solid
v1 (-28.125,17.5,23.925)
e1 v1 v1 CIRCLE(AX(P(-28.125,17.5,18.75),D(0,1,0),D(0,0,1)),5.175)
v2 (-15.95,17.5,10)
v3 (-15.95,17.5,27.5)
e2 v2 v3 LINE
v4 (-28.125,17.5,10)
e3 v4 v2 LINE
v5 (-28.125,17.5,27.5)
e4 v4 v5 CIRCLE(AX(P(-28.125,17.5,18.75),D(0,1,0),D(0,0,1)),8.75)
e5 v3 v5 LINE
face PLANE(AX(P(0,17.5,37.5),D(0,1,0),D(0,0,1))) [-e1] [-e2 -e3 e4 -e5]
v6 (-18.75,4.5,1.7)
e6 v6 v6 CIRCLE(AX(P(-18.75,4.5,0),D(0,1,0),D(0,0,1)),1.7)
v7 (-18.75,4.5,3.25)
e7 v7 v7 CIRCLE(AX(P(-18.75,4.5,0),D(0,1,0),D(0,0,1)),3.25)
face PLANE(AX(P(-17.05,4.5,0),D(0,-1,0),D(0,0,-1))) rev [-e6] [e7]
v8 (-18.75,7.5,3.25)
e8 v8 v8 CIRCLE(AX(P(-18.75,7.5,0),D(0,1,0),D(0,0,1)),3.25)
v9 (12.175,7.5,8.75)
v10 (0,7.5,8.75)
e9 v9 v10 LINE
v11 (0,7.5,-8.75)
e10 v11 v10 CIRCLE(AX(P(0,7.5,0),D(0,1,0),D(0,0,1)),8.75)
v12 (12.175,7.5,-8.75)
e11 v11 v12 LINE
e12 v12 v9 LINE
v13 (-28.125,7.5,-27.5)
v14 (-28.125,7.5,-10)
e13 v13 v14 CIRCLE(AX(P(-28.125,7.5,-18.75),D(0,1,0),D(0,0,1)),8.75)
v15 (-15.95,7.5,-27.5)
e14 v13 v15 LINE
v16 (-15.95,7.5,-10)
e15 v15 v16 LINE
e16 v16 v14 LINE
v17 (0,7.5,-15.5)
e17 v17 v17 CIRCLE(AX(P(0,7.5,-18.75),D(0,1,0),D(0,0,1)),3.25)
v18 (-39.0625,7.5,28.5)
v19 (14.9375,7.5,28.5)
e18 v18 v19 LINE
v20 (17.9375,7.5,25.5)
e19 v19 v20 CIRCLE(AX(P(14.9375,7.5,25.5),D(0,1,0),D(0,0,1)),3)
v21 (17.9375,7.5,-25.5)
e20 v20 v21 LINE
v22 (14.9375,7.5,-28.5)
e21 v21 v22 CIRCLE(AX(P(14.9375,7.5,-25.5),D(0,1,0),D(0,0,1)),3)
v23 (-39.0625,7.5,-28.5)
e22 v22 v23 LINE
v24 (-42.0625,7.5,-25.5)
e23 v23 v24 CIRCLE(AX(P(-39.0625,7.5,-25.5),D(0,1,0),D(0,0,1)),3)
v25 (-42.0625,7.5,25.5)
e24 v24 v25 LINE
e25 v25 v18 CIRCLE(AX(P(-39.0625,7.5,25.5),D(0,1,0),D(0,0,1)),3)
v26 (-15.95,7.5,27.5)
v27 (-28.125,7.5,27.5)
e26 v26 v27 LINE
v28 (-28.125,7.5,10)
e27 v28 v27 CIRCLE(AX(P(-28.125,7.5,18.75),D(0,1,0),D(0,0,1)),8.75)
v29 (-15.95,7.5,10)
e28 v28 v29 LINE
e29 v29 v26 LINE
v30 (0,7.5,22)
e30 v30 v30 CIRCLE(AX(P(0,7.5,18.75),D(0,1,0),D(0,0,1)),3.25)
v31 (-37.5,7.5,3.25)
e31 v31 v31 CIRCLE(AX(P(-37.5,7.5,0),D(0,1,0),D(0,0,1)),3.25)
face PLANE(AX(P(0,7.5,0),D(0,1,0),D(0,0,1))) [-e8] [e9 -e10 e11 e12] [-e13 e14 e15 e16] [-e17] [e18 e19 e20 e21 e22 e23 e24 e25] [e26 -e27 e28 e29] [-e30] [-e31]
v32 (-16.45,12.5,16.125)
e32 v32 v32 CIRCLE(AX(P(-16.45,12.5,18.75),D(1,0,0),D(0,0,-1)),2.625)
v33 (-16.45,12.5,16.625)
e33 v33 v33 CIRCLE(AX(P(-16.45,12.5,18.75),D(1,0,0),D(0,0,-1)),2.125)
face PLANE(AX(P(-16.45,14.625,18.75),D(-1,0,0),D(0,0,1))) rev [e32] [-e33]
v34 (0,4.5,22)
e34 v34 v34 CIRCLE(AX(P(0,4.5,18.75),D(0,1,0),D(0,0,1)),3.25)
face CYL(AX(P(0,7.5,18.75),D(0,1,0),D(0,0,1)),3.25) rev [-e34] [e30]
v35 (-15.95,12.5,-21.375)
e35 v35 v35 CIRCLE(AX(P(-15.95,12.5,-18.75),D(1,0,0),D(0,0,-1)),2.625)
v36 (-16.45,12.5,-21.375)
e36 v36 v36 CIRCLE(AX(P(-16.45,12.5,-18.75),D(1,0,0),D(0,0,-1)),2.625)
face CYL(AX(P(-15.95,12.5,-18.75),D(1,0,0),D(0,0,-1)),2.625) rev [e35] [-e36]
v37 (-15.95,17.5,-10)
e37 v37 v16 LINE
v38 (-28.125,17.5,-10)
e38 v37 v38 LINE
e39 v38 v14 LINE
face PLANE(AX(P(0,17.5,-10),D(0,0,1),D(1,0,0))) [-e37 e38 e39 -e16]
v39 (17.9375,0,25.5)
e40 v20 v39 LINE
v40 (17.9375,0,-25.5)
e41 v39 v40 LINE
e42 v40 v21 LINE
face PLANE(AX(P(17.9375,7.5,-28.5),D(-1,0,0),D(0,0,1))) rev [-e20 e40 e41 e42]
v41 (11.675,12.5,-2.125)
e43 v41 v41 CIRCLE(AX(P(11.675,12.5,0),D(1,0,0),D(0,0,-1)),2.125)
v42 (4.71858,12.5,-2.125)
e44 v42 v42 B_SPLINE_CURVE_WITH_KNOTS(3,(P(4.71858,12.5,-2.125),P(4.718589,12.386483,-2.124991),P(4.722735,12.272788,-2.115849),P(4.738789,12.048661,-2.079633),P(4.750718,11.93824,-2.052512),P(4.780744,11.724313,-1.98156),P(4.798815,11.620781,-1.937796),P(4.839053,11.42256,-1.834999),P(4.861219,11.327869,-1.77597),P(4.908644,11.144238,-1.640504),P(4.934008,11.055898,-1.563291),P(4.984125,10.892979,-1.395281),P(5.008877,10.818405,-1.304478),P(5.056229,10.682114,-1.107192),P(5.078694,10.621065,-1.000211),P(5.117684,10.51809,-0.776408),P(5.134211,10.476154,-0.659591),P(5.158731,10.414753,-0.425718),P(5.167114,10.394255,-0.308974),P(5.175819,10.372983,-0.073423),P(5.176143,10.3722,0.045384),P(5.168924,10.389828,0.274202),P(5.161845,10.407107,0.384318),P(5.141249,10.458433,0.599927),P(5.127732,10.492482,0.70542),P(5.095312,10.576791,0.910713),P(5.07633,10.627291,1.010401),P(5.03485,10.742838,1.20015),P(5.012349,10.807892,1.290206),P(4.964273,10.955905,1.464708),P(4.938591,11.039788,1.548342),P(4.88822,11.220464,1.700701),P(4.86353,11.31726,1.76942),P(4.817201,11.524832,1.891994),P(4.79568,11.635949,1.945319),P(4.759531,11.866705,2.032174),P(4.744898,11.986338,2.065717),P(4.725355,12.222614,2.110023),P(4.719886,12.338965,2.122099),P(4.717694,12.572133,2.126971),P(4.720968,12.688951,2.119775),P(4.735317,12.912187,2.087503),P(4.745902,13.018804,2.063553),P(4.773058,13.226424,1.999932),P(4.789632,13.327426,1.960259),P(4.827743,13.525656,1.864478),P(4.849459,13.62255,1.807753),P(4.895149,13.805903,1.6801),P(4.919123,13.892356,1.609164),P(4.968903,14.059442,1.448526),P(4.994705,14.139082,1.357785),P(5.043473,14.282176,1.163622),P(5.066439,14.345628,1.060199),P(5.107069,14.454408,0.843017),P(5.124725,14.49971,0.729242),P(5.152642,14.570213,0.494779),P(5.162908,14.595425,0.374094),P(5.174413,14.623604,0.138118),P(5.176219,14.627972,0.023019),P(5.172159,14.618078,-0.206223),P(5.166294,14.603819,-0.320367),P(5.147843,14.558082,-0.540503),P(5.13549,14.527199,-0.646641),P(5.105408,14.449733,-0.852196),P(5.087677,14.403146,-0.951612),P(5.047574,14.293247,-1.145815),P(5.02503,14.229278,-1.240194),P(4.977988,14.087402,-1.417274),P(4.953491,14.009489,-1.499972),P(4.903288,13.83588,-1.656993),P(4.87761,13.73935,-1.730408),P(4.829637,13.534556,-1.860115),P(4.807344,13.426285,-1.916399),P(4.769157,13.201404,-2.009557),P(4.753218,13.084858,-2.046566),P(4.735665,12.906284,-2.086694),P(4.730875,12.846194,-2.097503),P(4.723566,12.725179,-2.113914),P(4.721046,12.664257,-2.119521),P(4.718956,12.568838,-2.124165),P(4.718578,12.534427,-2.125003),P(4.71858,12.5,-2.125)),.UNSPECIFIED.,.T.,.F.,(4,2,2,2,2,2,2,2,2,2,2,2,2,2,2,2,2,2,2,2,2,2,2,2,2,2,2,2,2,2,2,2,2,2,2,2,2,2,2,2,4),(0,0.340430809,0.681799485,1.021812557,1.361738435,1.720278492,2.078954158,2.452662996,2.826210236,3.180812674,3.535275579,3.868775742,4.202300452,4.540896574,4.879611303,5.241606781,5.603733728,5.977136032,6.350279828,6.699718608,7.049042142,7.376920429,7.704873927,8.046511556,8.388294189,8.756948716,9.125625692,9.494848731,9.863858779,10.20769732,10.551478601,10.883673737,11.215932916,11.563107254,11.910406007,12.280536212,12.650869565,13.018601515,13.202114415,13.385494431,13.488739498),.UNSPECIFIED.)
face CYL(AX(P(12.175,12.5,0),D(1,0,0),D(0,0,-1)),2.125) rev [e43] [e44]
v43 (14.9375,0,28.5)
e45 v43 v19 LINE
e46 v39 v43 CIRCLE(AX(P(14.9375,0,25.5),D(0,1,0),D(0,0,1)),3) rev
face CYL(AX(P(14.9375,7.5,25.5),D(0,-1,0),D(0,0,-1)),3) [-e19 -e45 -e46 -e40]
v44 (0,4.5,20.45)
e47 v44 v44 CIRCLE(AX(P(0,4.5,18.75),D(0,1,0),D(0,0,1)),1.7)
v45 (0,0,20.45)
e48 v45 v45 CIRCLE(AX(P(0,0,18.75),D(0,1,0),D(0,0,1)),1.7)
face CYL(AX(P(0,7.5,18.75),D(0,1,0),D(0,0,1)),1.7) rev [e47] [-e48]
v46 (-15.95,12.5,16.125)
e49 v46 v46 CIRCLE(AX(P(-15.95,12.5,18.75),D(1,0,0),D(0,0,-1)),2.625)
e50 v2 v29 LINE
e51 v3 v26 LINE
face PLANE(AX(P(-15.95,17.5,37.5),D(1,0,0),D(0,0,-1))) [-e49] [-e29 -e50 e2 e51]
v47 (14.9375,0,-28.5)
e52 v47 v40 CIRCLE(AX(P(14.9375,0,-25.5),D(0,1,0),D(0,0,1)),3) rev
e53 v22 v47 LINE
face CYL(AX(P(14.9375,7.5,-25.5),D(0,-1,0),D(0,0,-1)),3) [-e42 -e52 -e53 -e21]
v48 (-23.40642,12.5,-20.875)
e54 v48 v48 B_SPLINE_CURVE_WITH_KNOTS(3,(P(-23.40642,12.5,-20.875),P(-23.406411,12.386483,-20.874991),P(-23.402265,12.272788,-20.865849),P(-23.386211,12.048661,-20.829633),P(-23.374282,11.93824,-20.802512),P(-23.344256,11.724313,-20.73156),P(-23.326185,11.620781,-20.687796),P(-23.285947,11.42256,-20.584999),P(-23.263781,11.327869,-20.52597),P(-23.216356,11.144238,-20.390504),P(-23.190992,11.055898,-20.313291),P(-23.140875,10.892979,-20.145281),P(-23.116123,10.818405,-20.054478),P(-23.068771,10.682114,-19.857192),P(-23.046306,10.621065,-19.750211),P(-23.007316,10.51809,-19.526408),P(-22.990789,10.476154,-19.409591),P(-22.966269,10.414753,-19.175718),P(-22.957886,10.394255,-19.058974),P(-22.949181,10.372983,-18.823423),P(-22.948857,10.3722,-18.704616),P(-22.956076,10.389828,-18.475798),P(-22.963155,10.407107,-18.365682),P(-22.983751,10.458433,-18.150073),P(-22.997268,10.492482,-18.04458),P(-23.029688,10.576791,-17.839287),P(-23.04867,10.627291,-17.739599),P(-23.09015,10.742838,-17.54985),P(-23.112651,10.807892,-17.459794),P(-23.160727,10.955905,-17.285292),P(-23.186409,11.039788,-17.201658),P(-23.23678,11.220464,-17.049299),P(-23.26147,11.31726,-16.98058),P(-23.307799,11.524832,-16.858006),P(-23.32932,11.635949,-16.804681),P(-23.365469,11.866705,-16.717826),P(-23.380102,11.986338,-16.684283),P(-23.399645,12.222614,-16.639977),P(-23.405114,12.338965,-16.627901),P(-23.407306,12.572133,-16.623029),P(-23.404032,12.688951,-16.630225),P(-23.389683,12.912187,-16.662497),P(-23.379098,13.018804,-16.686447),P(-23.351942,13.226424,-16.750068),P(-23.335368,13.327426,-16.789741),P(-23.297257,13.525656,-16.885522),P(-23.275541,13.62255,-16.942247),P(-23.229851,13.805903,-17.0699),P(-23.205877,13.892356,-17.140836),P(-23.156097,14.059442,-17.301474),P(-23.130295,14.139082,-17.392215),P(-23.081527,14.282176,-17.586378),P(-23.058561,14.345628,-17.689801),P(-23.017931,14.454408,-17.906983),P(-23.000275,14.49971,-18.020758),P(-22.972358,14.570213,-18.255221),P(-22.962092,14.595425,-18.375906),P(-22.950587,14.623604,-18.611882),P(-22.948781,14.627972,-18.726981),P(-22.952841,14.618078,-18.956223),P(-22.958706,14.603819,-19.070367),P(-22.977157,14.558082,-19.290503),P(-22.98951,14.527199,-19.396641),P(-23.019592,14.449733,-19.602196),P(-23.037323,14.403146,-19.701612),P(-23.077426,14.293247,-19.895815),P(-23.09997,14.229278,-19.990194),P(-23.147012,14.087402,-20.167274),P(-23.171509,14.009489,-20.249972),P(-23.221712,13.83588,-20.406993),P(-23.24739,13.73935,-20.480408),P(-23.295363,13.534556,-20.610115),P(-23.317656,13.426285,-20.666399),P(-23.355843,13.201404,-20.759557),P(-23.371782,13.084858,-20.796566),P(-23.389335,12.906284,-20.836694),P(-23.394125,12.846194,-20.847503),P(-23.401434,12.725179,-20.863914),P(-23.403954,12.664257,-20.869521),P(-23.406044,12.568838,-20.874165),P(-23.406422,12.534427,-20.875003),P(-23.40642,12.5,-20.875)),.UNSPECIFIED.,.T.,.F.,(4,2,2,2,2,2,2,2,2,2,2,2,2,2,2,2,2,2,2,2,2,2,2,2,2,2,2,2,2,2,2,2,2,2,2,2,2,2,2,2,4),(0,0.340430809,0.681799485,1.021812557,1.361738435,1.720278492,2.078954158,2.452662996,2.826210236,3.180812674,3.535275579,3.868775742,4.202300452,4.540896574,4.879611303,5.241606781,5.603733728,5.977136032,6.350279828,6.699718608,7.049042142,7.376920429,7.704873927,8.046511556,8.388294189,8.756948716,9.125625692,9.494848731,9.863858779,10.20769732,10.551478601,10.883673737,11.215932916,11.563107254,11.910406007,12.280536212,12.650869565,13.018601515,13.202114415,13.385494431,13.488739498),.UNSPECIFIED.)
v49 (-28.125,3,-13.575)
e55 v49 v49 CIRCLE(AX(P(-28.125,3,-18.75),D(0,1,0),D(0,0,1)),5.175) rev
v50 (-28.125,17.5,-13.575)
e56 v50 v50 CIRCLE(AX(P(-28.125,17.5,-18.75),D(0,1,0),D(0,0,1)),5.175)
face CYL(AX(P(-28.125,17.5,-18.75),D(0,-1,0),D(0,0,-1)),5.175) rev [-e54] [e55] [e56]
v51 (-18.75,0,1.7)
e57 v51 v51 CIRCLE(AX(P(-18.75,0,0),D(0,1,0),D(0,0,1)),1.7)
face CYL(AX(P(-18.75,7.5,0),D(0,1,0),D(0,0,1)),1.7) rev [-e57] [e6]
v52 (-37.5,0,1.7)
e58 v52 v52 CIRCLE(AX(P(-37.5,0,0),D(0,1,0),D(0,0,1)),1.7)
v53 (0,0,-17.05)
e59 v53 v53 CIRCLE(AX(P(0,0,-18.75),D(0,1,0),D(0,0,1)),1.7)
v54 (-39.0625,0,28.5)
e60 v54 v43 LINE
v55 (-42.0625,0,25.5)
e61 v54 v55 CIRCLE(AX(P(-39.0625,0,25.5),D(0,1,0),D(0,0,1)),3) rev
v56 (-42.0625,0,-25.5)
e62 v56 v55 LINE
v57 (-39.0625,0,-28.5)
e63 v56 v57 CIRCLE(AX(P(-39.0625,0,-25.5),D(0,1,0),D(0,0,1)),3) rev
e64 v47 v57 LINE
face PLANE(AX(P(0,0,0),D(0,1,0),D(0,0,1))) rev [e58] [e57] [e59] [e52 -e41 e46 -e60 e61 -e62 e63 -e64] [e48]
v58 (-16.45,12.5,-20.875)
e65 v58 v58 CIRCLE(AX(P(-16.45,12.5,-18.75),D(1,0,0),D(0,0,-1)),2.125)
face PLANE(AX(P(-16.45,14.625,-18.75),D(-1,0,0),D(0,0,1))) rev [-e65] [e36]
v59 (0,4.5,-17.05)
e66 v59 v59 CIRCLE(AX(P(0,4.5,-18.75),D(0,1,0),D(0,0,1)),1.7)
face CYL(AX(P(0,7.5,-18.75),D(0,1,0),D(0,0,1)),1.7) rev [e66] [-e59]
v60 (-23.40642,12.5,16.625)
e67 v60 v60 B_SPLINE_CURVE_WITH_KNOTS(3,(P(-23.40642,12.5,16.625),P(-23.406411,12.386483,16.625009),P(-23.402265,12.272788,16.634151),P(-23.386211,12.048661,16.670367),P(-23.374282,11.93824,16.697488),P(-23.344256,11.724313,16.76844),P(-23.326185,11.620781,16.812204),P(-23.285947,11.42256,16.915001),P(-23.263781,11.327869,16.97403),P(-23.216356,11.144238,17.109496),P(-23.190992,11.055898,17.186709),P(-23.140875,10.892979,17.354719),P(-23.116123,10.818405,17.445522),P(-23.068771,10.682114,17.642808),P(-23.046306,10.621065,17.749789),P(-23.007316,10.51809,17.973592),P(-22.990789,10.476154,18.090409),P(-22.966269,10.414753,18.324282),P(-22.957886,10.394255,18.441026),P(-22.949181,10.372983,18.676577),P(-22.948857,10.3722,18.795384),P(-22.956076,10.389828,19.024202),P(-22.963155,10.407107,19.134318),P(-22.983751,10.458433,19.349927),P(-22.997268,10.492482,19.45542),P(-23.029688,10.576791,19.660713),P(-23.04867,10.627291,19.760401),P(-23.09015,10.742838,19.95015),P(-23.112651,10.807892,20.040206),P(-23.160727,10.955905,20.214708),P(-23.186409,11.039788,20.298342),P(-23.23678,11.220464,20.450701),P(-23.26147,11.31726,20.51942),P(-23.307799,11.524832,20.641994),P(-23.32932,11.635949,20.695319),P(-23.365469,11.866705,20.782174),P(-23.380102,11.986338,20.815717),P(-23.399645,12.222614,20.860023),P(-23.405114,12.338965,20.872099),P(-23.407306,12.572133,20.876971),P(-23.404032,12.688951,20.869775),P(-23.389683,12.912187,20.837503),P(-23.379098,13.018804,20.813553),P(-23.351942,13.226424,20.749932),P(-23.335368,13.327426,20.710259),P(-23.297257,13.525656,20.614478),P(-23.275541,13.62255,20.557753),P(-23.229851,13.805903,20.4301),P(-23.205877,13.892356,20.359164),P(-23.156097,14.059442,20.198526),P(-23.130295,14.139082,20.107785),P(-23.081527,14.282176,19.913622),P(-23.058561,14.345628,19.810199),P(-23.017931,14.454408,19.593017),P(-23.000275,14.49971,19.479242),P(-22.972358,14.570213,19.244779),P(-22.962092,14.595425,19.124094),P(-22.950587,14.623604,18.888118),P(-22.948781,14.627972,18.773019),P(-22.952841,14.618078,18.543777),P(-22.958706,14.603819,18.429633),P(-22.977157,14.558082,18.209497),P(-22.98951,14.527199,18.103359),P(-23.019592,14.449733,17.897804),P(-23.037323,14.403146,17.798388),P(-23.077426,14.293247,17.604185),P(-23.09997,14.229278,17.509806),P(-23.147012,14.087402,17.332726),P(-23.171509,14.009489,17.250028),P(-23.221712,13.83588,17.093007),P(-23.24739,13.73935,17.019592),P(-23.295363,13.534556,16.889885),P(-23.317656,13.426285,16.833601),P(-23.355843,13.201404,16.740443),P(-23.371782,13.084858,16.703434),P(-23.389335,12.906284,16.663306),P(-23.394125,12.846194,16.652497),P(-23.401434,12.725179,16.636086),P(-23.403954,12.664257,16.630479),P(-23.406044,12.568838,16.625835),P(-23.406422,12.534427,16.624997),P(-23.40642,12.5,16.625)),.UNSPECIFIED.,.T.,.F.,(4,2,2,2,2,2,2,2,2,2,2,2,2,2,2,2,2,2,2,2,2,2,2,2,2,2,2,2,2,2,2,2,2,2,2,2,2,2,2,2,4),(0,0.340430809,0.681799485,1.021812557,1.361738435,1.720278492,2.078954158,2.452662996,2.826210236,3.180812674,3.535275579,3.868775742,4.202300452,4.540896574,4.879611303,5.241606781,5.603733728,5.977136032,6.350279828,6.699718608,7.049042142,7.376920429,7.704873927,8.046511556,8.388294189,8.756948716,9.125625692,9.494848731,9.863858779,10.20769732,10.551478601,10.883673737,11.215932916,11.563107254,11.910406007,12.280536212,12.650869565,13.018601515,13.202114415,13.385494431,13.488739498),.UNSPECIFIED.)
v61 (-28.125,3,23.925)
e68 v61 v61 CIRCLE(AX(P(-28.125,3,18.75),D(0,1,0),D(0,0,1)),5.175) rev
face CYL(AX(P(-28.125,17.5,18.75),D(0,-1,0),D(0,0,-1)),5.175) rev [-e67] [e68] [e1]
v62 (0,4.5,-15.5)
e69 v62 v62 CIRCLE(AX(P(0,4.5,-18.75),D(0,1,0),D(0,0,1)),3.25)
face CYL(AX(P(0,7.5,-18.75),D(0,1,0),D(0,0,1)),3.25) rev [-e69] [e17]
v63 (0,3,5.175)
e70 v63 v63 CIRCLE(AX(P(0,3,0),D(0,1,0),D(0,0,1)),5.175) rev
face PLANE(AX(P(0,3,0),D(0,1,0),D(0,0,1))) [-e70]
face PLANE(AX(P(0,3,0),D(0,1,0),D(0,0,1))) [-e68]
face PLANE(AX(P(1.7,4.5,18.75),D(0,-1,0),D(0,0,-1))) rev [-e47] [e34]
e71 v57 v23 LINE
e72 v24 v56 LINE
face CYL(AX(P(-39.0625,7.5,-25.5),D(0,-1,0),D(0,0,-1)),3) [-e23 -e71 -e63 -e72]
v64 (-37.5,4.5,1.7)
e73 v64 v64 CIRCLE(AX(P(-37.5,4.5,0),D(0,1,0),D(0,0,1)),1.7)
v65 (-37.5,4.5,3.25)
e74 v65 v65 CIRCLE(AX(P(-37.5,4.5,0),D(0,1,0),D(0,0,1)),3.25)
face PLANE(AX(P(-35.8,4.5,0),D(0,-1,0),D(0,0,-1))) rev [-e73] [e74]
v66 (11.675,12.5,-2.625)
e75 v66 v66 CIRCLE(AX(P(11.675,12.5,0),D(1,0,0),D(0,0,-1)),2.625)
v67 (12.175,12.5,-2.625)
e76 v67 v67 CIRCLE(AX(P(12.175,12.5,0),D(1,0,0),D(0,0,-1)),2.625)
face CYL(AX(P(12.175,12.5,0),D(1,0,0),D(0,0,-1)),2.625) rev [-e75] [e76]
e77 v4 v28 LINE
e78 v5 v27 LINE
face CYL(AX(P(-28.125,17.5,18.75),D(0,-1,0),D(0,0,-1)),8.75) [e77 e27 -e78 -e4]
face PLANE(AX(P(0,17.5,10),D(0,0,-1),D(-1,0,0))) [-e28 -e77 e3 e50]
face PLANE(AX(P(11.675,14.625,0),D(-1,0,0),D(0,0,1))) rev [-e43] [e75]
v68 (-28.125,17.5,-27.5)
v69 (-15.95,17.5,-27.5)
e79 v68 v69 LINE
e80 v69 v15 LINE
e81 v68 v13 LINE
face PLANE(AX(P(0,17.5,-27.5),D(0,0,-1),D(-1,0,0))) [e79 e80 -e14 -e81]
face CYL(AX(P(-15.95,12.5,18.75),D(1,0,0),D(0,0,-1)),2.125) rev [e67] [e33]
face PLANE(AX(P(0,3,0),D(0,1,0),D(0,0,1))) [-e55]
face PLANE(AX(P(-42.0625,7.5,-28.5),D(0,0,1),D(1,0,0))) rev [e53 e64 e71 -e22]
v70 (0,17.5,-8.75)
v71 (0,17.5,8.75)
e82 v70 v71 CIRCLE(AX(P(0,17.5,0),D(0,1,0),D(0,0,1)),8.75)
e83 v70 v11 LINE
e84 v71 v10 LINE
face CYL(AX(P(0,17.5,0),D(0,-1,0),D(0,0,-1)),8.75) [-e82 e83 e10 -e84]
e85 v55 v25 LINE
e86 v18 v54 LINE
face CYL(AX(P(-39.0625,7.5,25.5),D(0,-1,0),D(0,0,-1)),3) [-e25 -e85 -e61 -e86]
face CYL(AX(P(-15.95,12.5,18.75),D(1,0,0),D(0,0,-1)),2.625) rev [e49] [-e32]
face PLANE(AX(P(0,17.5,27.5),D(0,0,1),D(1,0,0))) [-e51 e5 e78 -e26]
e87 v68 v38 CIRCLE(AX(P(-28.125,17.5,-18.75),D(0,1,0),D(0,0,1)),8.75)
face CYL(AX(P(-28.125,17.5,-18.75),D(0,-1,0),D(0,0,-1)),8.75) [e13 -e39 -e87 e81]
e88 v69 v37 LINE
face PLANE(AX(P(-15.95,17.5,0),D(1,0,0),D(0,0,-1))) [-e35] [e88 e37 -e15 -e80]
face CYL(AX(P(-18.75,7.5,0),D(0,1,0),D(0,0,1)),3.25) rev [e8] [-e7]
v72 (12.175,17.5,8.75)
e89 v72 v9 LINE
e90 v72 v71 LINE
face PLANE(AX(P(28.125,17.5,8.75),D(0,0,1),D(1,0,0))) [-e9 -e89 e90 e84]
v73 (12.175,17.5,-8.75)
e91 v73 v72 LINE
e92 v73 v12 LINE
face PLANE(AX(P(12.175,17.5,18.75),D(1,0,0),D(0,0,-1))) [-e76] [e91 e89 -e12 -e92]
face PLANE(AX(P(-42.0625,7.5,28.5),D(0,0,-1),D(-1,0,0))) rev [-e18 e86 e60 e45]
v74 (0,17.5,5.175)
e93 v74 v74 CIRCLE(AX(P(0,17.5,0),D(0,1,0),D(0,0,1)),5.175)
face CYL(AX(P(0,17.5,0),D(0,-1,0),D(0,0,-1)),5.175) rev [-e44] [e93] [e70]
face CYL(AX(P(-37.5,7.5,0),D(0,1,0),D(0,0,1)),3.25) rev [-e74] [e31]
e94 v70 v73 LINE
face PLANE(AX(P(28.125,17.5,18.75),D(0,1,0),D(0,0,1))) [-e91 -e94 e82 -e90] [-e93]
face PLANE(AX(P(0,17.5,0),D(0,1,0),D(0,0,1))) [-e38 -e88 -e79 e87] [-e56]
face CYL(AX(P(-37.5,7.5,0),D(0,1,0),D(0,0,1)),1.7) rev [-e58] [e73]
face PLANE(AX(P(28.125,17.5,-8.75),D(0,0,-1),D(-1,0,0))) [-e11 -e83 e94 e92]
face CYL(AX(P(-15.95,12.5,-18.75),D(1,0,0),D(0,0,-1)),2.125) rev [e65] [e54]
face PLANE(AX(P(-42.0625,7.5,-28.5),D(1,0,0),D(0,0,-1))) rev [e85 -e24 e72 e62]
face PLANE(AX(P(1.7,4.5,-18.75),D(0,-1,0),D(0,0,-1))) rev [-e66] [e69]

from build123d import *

# Parameters (mm, degrees)
SKETCH1_W                      = 60
SKETCH1_H                      = 57
BOSS_EXTRUDE1_DEPTH            = 7.5
SKETCH3_R                      = 8.75
SKETCH3_R_2                    = 5.175
BOSS_EXTRUDE2_DEPTH            = 10
CUT_EXTRUDE1_START             = -4.5
SKETCH4_R                      = 5.175
CUT_EXTRUDE1_DEPTH             = 4.5
CBORE_FOR_M3_SHCS2_D           = 4.25
CBORE_FOR_M3_SHCS2_DEPTH       = 10
CBORE_FOR_M3_SHCS2_CBORE_D     = 5.25
CBORE_FOR_M3_SHCS2_CBORE_DEPTH = 0.5
SKETCH_PATTERN1_START          = 3
SKETCH_PATTERN1_OUTLINE_R      = 5.175
SKETCH_PATTERN1_DEPTH          = 4.5
SKETCH_PATTERN1_START_2        = 15.125
SKETCH_PATTERN1_2_OUTLINE_R    = 5.175
SKETCH_PATTERN1_2_DEPTH        = 2.375
SKETCH_PATTERN1_START_3        = 7.5
SKETCH_PATTERN1_3_OUTLINE_R    = 5.175
SKETCH_PATTERN1_3_DEPTH        = 2.3749999
SKETCH_PATTERN1_START_4        = 9.8749999
SKETCH_PATTERN1_4_OUTLINE_R    = 5.175
SKETCH_PATTERN1_4_DEPTH        = 5.2500001
SKETCH_PATTERN1_START_5        = -24
SKETCH_PATTERN1_5_OUTLINE_R    = 2.125
SKETCH_PATTERN1_5_DEPTH        = 8.05
SKETCH_PATTERN1_START_6        = 4.718580183
SKETCH_PATTERN1_6_OUTLINE_R    = 2.125
SKETCH_PATTERN1_6_DEPTH        = 7.456419817
SKETCH_PATTERN1_START_7        = -16.45
SKETCH_PATTERN1_7_OUTLINE_R    = 2.625
SKETCH_PATTERN1_7_OUTLINE_R_2  = 2.125
SKETCH_PATTERN1_7_DEPTH        = 0.5
SKETCH_PATTERN1_START_8        = 11.675
SKETCH_PATTERN1_8_OUTLINE_R    = 2.625
SKETCH_PATTERN1_8_OUTLINE_R_2  = 2.125
SKETCH_PATTERN1_8_DEPTH        = 0.5
CBORE_FOR_M3_SHCS1_D           = 3.4
CBORE_FOR_M3_SHCS1_CBORE_D     = 6.5
CBORE_FOR_M3_SHCS1_CBORE_DEPTH = 3
FILLET2_R                      = 3


with BuildPart() as part:
    # Sketch1 → Boss-Extrude1 (new body)
    with BuildSketch(Plane(origin=(0, 0, 0), x_dir=(1, 0, 0), z_dir=(0, 1, 0))):
        with Locations((-12.0625, 0)):
            Rectangle(SKETCH1_W, SKETCH1_H)
    extrude(amount=BOSS_EXTRUDE1_DEPTH)

    # Sketch3 → Boss-Extrude2 (add)
    # profile 1 of 2: a face of its own
    with BuildSketch(Plane(origin=(0, 7.5, 0), x_dir=(1, 0, 0), z_dir=(0, 1, 0))):
        with Locations((-28.125, 18.75)):
            Circle(SKETCH3_R)
        with Locations(Location((-28.125, 18.75, 0), (0, 0, 270))):
            Circle(SKETCH3_R_2, mode=Mode.SUBTRACT)
    # profile 2 of 2: a face of its own
    with BuildSketch(Plane(origin=(0, 7.5, 0), x_dir=(1, 0, 0), z_dir=(0, 1, 0))):
        with BuildLine():
            Line((-15.95, 27.5), (-28.125, 27.5))
            ThreePointArc((-28.125, 27.5), (-21.937815665, 24.937184335), (-19.375, 18.75))
            ThreePointArc((-19.375, 18.75), (-21.937815665, 12.562815665), (-28.125, 10))
            Line((-28.125, 10), (-15.95, 10))
            Line((-15.95, 10), (-15.95, 27.5))
        make_face()
    extrude(amount=BOSS_EXTRUDE2_DEPTH)

    # Sketch4 → Cut-Extrude1 (cut)
    with BuildSketch(Plane(origin=(0, 7.5, 0), x_dir=(1, 0, 0), z_dir=(0, 1, 0)).offset(CUT_EXTRUDE1_START)):
        with Locations(Location((-28.125, 18.75, 0), (0, 0, 270))):
            Circle(SKETCH4_R)
    extrude(amount=CUT_EXTRUDE1_DEPTH, mode=Mode.SUBTRACT)

    # CBORE for M3 SHCS2
    with Locations(Plane(origin=(-15.95, 0, 0), x_dir=(0, 0, -1), z_dir=(1, 0, 0))):
        with Locations((18.75, 12.5)):
            CounterBoreHole(CBORE_FOR_M3_SHCS2_D / 2, CBORE_FOR_M3_SHCS2_CBORE_D / 2, CBORE_FOR_M3_SHCS2_CBORE_DEPTH, depth=CBORE_FOR_M3_SHCS2_DEPTH)

    # Sketch-Pattern1: read off the stored shape, not the designer's step
    # Sketch-Pattern1 outline → Sketch-Pattern1 (cut)
    with BuildSketch(Plane(origin=(0, 0, 0), x_dir=(1, 0, 0), z_dir=(0, 1, 0)).offset(SKETCH_PATTERN1_START)):
        Circle(SKETCH_PATTERN1_OUTLINE_R)
        with Locations((-28.125, -18.75)):
            Circle(SKETCH_PATTERN1_OUTLINE_R)
    extrude(amount=SKETCH_PATTERN1_DEPTH, mode=Mode.SUBTRACT)

    # Sketch-Pattern1 3 outline → Sketch-Pattern1 3 (add)
    # profile 1 of 2: a face of its own
    with BuildSketch(Plane(origin=(0, 0, 0), x_dir=(1, 0, 0), z_dir=(0, 1, 0)).offset(SKETCH_PATTERN1_START_3)):
        with BuildLine():
            Line((-28.125, -27.5), (-15.95, -27.5))
            Line((-15.95, -27.5), (-15.95, -10))
            Line((-15.95, -10), (-28.125, -10))
            ThreePointArc((-28.125, -10), (-36.875, -18.75), (-28.125, -27.5))
        make_face()
        with Locations((-28.125, -18.75)):
            Circle(SKETCH_PATTERN1_3_OUTLINE_R, mode=Mode.SUBTRACT)
    # profile 2 of 2: a face of its own
    with BuildSketch(Plane(origin=(0, 0, 0), x_dir=(1, 0, 0), z_dir=(0, 1, 0)).offset(SKETCH_PATTERN1_START_3)):
        with BuildLine():
            ThreePointArc((0, 8.75), (-8.75, 0), (0, -8.75))
            Line((0, -8.75), (12.175, -8.75))
            Line((12.175, -8.75), (12.175, 8.75))
            Line((12.175, 8.75), (0, 8.75))
        make_face()
        Circle(SKETCH_PATTERN1_3_OUTLINE_R, mode=Mode.SUBTRACT)
    extrude(amount=SKETCH_PATTERN1_3_DEPTH)



with BuildPart() as body_2:
    # Sketch-Pattern1 2 outline → Sketch-Pattern1 2 (new body)
    # profile 1 of 2: a face of its own
    with BuildSketch(Plane(origin=(0, 0, 0), x_dir=(1, 0, 0), z_dir=(0, 1, 0)).offset(SKETCH_PATTERN1_START_2)):
        with BuildLine():
            Line((-28.125, -27.5), (-15.95, -27.5))
            Line((-15.95, -27.5), (-15.95, -10))
            Line((-15.95, -10), (-28.125, -10))
            ThreePointArc((-28.125, -10), (-36.875, -18.75), (-28.125, -27.5))
        make_face()
        with Locations((-28.125, -18.75)):
            Circle(SKETCH_PATTERN1_2_OUTLINE_R, mode=Mode.SUBTRACT)
    # profile 2 of 2: a face of its own
    with BuildSketch(Plane(origin=(0, 0, 0), x_dir=(1, 0, 0), z_dir=(0, 1, 0)).offset(SKETCH_PATTERN1_START_2)):
        with BuildLine():
            ThreePointArc((0, 8.75), (-8.75, 0), (0, -8.75))
            Line((0, -8.75), (12.175, -8.75))
            Line((12.175, -8.75), (12.175, 8.75))
            Line((12.175, 8.75), (0, 8.75))
        make_face()
        Circle(SKETCH_PATTERN1_2_OUTLINE_R, mode=Mode.SUBTRACT)
    extrude(amount=SKETCH_PATTERN1_2_DEPTH)


with BuildPart() as part_1:
    add(part.part)

    add(body_2.part)  # Sketch-Pattern1 4 merges body 2
    # Sketch-Pattern1 4 outline → Sketch-Pattern1 4 (add)
    # profile 1 of 2: a face of its own
    with BuildSketch(Plane(origin=(0, 0, 0), x_dir=(1, 0, 0), z_dir=(0, 1, 0)).offset(SKETCH_PATTERN1_START_4)):
        with BuildLine():
            Line((-28.125, -27.5), (-15.95, -27.5))
            Line((-15.95, -27.5), (-15.95, -10))
            Line((-15.95, -10), (-28.125, -10))
            ThreePointArc((-28.125, -10), (-36.875, -18.75), (-28.125, -27.5))
        make_face()
        with Locations((-28.125, -18.75)):
            Circle(SKETCH_PATTERN1_4_OUTLINE_R, mode=Mode.SUBTRACT)
    # profile 2 of 2: a face of its own
    with BuildSketch(Plane(origin=(0, 0, 0), x_dir=(1, 0, 0), z_dir=(0, 1, 0)).offset(SKETCH_PATTERN1_START_4)):
        with BuildLine():
            ThreePointArc((0, 8.75), (-8.75, 0), (0, -8.75))
            Line((0, -8.75), (12.175, -8.75))
            Line((12.175, -8.75), (12.175, 8.75))
            Line((12.175, 8.75), (0, 8.75))
        make_face()
        Circle(SKETCH_PATTERN1_4_OUTLINE_R, mode=Mode.SUBTRACT)
    extrude(amount=SKETCH_PATTERN1_4_DEPTH)

    # Sketch-Pattern1 5 outline → Sketch-Pattern1 5 (cut)
    with BuildSketch(Plane.YZ.offset(SKETCH_PATTERN1_START_5)):
        with Locations((12.5, 18.75)):
            Circle(SKETCH_PATTERN1_5_OUTLINE_R)
    extrude(amount=SKETCH_PATTERN1_5_DEPTH, mode=Mode.SUBTRACT)

    # Sketch-Pattern1 6 outline → Sketch-Pattern1 6 (cut)
    with BuildSketch(Plane.YZ.offset(SKETCH_PATTERN1_START_6)):
        with Locations((12.5, 0)):
            Circle(SKETCH_PATTERN1_6_OUTLINE_R)
    extrude(amount=SKETCH_PATTERN1_6_DEPTH, mode=Mode.SUBTRACT)

    # Sketch-Pattern1 7 outline → Sketch-Pattern1 7 (cut)
    with BuildSketch(Plane.YZ.offset(SKETCH_PATTERN1_START_7)):
        with Locations((12.5, 18.75)):
            Circle(SKETCH_PATTERN1_7_OUTLINE_R)
        with Locations((12.5, 18.75)):
            Circle(SKETCH_PATTERN1_7_OUTLINE_R_2, mode=Mode.SUBTRACT)
    extrude(amount=SKETCH_PATTERN1_7_DEPTH, mode=Mode.SUBTRACT)

    # Sketch-Pattern1 8 outline → Sketch-Pattern1 8 (cut)
    with BuildSketch(Plane.YZ.offset(SKETCH_PATTERN1_START_8)):
        with Locations((12.5, 0)):
            Circle(SKETCH_PATTERN1_8_OUTLINE_R)
        with Locations((12.5, 0)):
            Circle(SKETCH_PATTERN1_8_OUTLINE_R_2, mode=Mode.SUBTRACT)
    extrude(amount=SKETCH_PATTERN1_8_DEPTH, mode=Mode.SUBTRACT)

    # CBORE for M3 SHCS1 (through all)
    with Locations(Plane(origin=(0, 7.5, 0), x_dir=(1, 0, 0), z_dir=(0, 1, 0))):
        with Locations((-37.5, 0), (0, 18.75), (-18.75, 0), (0, -18.75)):
            CounterBoreHole(CBORE_FOR_M3_SHCS1_D / 2, CBORE_FOR_M3_SHCS1_CBORE_D / 2, CBORE_FOR_M3_SHCS1_CBORE_DEPTH)

    # Fillet2
    fillet2_edges = [part_1.edges().sort_by_distance(p)[0] for p in [
        (-42.0625, 3.75, -28.5),
        (17.9375, 3.75, -28.5),
        (17.9375, 3.75, 28.5),
        (-42.0625, 3.75, 28.5),
    ]]
    fillet(fillet2_edges, radius=FILLET2_R)


solid = part_1.part
